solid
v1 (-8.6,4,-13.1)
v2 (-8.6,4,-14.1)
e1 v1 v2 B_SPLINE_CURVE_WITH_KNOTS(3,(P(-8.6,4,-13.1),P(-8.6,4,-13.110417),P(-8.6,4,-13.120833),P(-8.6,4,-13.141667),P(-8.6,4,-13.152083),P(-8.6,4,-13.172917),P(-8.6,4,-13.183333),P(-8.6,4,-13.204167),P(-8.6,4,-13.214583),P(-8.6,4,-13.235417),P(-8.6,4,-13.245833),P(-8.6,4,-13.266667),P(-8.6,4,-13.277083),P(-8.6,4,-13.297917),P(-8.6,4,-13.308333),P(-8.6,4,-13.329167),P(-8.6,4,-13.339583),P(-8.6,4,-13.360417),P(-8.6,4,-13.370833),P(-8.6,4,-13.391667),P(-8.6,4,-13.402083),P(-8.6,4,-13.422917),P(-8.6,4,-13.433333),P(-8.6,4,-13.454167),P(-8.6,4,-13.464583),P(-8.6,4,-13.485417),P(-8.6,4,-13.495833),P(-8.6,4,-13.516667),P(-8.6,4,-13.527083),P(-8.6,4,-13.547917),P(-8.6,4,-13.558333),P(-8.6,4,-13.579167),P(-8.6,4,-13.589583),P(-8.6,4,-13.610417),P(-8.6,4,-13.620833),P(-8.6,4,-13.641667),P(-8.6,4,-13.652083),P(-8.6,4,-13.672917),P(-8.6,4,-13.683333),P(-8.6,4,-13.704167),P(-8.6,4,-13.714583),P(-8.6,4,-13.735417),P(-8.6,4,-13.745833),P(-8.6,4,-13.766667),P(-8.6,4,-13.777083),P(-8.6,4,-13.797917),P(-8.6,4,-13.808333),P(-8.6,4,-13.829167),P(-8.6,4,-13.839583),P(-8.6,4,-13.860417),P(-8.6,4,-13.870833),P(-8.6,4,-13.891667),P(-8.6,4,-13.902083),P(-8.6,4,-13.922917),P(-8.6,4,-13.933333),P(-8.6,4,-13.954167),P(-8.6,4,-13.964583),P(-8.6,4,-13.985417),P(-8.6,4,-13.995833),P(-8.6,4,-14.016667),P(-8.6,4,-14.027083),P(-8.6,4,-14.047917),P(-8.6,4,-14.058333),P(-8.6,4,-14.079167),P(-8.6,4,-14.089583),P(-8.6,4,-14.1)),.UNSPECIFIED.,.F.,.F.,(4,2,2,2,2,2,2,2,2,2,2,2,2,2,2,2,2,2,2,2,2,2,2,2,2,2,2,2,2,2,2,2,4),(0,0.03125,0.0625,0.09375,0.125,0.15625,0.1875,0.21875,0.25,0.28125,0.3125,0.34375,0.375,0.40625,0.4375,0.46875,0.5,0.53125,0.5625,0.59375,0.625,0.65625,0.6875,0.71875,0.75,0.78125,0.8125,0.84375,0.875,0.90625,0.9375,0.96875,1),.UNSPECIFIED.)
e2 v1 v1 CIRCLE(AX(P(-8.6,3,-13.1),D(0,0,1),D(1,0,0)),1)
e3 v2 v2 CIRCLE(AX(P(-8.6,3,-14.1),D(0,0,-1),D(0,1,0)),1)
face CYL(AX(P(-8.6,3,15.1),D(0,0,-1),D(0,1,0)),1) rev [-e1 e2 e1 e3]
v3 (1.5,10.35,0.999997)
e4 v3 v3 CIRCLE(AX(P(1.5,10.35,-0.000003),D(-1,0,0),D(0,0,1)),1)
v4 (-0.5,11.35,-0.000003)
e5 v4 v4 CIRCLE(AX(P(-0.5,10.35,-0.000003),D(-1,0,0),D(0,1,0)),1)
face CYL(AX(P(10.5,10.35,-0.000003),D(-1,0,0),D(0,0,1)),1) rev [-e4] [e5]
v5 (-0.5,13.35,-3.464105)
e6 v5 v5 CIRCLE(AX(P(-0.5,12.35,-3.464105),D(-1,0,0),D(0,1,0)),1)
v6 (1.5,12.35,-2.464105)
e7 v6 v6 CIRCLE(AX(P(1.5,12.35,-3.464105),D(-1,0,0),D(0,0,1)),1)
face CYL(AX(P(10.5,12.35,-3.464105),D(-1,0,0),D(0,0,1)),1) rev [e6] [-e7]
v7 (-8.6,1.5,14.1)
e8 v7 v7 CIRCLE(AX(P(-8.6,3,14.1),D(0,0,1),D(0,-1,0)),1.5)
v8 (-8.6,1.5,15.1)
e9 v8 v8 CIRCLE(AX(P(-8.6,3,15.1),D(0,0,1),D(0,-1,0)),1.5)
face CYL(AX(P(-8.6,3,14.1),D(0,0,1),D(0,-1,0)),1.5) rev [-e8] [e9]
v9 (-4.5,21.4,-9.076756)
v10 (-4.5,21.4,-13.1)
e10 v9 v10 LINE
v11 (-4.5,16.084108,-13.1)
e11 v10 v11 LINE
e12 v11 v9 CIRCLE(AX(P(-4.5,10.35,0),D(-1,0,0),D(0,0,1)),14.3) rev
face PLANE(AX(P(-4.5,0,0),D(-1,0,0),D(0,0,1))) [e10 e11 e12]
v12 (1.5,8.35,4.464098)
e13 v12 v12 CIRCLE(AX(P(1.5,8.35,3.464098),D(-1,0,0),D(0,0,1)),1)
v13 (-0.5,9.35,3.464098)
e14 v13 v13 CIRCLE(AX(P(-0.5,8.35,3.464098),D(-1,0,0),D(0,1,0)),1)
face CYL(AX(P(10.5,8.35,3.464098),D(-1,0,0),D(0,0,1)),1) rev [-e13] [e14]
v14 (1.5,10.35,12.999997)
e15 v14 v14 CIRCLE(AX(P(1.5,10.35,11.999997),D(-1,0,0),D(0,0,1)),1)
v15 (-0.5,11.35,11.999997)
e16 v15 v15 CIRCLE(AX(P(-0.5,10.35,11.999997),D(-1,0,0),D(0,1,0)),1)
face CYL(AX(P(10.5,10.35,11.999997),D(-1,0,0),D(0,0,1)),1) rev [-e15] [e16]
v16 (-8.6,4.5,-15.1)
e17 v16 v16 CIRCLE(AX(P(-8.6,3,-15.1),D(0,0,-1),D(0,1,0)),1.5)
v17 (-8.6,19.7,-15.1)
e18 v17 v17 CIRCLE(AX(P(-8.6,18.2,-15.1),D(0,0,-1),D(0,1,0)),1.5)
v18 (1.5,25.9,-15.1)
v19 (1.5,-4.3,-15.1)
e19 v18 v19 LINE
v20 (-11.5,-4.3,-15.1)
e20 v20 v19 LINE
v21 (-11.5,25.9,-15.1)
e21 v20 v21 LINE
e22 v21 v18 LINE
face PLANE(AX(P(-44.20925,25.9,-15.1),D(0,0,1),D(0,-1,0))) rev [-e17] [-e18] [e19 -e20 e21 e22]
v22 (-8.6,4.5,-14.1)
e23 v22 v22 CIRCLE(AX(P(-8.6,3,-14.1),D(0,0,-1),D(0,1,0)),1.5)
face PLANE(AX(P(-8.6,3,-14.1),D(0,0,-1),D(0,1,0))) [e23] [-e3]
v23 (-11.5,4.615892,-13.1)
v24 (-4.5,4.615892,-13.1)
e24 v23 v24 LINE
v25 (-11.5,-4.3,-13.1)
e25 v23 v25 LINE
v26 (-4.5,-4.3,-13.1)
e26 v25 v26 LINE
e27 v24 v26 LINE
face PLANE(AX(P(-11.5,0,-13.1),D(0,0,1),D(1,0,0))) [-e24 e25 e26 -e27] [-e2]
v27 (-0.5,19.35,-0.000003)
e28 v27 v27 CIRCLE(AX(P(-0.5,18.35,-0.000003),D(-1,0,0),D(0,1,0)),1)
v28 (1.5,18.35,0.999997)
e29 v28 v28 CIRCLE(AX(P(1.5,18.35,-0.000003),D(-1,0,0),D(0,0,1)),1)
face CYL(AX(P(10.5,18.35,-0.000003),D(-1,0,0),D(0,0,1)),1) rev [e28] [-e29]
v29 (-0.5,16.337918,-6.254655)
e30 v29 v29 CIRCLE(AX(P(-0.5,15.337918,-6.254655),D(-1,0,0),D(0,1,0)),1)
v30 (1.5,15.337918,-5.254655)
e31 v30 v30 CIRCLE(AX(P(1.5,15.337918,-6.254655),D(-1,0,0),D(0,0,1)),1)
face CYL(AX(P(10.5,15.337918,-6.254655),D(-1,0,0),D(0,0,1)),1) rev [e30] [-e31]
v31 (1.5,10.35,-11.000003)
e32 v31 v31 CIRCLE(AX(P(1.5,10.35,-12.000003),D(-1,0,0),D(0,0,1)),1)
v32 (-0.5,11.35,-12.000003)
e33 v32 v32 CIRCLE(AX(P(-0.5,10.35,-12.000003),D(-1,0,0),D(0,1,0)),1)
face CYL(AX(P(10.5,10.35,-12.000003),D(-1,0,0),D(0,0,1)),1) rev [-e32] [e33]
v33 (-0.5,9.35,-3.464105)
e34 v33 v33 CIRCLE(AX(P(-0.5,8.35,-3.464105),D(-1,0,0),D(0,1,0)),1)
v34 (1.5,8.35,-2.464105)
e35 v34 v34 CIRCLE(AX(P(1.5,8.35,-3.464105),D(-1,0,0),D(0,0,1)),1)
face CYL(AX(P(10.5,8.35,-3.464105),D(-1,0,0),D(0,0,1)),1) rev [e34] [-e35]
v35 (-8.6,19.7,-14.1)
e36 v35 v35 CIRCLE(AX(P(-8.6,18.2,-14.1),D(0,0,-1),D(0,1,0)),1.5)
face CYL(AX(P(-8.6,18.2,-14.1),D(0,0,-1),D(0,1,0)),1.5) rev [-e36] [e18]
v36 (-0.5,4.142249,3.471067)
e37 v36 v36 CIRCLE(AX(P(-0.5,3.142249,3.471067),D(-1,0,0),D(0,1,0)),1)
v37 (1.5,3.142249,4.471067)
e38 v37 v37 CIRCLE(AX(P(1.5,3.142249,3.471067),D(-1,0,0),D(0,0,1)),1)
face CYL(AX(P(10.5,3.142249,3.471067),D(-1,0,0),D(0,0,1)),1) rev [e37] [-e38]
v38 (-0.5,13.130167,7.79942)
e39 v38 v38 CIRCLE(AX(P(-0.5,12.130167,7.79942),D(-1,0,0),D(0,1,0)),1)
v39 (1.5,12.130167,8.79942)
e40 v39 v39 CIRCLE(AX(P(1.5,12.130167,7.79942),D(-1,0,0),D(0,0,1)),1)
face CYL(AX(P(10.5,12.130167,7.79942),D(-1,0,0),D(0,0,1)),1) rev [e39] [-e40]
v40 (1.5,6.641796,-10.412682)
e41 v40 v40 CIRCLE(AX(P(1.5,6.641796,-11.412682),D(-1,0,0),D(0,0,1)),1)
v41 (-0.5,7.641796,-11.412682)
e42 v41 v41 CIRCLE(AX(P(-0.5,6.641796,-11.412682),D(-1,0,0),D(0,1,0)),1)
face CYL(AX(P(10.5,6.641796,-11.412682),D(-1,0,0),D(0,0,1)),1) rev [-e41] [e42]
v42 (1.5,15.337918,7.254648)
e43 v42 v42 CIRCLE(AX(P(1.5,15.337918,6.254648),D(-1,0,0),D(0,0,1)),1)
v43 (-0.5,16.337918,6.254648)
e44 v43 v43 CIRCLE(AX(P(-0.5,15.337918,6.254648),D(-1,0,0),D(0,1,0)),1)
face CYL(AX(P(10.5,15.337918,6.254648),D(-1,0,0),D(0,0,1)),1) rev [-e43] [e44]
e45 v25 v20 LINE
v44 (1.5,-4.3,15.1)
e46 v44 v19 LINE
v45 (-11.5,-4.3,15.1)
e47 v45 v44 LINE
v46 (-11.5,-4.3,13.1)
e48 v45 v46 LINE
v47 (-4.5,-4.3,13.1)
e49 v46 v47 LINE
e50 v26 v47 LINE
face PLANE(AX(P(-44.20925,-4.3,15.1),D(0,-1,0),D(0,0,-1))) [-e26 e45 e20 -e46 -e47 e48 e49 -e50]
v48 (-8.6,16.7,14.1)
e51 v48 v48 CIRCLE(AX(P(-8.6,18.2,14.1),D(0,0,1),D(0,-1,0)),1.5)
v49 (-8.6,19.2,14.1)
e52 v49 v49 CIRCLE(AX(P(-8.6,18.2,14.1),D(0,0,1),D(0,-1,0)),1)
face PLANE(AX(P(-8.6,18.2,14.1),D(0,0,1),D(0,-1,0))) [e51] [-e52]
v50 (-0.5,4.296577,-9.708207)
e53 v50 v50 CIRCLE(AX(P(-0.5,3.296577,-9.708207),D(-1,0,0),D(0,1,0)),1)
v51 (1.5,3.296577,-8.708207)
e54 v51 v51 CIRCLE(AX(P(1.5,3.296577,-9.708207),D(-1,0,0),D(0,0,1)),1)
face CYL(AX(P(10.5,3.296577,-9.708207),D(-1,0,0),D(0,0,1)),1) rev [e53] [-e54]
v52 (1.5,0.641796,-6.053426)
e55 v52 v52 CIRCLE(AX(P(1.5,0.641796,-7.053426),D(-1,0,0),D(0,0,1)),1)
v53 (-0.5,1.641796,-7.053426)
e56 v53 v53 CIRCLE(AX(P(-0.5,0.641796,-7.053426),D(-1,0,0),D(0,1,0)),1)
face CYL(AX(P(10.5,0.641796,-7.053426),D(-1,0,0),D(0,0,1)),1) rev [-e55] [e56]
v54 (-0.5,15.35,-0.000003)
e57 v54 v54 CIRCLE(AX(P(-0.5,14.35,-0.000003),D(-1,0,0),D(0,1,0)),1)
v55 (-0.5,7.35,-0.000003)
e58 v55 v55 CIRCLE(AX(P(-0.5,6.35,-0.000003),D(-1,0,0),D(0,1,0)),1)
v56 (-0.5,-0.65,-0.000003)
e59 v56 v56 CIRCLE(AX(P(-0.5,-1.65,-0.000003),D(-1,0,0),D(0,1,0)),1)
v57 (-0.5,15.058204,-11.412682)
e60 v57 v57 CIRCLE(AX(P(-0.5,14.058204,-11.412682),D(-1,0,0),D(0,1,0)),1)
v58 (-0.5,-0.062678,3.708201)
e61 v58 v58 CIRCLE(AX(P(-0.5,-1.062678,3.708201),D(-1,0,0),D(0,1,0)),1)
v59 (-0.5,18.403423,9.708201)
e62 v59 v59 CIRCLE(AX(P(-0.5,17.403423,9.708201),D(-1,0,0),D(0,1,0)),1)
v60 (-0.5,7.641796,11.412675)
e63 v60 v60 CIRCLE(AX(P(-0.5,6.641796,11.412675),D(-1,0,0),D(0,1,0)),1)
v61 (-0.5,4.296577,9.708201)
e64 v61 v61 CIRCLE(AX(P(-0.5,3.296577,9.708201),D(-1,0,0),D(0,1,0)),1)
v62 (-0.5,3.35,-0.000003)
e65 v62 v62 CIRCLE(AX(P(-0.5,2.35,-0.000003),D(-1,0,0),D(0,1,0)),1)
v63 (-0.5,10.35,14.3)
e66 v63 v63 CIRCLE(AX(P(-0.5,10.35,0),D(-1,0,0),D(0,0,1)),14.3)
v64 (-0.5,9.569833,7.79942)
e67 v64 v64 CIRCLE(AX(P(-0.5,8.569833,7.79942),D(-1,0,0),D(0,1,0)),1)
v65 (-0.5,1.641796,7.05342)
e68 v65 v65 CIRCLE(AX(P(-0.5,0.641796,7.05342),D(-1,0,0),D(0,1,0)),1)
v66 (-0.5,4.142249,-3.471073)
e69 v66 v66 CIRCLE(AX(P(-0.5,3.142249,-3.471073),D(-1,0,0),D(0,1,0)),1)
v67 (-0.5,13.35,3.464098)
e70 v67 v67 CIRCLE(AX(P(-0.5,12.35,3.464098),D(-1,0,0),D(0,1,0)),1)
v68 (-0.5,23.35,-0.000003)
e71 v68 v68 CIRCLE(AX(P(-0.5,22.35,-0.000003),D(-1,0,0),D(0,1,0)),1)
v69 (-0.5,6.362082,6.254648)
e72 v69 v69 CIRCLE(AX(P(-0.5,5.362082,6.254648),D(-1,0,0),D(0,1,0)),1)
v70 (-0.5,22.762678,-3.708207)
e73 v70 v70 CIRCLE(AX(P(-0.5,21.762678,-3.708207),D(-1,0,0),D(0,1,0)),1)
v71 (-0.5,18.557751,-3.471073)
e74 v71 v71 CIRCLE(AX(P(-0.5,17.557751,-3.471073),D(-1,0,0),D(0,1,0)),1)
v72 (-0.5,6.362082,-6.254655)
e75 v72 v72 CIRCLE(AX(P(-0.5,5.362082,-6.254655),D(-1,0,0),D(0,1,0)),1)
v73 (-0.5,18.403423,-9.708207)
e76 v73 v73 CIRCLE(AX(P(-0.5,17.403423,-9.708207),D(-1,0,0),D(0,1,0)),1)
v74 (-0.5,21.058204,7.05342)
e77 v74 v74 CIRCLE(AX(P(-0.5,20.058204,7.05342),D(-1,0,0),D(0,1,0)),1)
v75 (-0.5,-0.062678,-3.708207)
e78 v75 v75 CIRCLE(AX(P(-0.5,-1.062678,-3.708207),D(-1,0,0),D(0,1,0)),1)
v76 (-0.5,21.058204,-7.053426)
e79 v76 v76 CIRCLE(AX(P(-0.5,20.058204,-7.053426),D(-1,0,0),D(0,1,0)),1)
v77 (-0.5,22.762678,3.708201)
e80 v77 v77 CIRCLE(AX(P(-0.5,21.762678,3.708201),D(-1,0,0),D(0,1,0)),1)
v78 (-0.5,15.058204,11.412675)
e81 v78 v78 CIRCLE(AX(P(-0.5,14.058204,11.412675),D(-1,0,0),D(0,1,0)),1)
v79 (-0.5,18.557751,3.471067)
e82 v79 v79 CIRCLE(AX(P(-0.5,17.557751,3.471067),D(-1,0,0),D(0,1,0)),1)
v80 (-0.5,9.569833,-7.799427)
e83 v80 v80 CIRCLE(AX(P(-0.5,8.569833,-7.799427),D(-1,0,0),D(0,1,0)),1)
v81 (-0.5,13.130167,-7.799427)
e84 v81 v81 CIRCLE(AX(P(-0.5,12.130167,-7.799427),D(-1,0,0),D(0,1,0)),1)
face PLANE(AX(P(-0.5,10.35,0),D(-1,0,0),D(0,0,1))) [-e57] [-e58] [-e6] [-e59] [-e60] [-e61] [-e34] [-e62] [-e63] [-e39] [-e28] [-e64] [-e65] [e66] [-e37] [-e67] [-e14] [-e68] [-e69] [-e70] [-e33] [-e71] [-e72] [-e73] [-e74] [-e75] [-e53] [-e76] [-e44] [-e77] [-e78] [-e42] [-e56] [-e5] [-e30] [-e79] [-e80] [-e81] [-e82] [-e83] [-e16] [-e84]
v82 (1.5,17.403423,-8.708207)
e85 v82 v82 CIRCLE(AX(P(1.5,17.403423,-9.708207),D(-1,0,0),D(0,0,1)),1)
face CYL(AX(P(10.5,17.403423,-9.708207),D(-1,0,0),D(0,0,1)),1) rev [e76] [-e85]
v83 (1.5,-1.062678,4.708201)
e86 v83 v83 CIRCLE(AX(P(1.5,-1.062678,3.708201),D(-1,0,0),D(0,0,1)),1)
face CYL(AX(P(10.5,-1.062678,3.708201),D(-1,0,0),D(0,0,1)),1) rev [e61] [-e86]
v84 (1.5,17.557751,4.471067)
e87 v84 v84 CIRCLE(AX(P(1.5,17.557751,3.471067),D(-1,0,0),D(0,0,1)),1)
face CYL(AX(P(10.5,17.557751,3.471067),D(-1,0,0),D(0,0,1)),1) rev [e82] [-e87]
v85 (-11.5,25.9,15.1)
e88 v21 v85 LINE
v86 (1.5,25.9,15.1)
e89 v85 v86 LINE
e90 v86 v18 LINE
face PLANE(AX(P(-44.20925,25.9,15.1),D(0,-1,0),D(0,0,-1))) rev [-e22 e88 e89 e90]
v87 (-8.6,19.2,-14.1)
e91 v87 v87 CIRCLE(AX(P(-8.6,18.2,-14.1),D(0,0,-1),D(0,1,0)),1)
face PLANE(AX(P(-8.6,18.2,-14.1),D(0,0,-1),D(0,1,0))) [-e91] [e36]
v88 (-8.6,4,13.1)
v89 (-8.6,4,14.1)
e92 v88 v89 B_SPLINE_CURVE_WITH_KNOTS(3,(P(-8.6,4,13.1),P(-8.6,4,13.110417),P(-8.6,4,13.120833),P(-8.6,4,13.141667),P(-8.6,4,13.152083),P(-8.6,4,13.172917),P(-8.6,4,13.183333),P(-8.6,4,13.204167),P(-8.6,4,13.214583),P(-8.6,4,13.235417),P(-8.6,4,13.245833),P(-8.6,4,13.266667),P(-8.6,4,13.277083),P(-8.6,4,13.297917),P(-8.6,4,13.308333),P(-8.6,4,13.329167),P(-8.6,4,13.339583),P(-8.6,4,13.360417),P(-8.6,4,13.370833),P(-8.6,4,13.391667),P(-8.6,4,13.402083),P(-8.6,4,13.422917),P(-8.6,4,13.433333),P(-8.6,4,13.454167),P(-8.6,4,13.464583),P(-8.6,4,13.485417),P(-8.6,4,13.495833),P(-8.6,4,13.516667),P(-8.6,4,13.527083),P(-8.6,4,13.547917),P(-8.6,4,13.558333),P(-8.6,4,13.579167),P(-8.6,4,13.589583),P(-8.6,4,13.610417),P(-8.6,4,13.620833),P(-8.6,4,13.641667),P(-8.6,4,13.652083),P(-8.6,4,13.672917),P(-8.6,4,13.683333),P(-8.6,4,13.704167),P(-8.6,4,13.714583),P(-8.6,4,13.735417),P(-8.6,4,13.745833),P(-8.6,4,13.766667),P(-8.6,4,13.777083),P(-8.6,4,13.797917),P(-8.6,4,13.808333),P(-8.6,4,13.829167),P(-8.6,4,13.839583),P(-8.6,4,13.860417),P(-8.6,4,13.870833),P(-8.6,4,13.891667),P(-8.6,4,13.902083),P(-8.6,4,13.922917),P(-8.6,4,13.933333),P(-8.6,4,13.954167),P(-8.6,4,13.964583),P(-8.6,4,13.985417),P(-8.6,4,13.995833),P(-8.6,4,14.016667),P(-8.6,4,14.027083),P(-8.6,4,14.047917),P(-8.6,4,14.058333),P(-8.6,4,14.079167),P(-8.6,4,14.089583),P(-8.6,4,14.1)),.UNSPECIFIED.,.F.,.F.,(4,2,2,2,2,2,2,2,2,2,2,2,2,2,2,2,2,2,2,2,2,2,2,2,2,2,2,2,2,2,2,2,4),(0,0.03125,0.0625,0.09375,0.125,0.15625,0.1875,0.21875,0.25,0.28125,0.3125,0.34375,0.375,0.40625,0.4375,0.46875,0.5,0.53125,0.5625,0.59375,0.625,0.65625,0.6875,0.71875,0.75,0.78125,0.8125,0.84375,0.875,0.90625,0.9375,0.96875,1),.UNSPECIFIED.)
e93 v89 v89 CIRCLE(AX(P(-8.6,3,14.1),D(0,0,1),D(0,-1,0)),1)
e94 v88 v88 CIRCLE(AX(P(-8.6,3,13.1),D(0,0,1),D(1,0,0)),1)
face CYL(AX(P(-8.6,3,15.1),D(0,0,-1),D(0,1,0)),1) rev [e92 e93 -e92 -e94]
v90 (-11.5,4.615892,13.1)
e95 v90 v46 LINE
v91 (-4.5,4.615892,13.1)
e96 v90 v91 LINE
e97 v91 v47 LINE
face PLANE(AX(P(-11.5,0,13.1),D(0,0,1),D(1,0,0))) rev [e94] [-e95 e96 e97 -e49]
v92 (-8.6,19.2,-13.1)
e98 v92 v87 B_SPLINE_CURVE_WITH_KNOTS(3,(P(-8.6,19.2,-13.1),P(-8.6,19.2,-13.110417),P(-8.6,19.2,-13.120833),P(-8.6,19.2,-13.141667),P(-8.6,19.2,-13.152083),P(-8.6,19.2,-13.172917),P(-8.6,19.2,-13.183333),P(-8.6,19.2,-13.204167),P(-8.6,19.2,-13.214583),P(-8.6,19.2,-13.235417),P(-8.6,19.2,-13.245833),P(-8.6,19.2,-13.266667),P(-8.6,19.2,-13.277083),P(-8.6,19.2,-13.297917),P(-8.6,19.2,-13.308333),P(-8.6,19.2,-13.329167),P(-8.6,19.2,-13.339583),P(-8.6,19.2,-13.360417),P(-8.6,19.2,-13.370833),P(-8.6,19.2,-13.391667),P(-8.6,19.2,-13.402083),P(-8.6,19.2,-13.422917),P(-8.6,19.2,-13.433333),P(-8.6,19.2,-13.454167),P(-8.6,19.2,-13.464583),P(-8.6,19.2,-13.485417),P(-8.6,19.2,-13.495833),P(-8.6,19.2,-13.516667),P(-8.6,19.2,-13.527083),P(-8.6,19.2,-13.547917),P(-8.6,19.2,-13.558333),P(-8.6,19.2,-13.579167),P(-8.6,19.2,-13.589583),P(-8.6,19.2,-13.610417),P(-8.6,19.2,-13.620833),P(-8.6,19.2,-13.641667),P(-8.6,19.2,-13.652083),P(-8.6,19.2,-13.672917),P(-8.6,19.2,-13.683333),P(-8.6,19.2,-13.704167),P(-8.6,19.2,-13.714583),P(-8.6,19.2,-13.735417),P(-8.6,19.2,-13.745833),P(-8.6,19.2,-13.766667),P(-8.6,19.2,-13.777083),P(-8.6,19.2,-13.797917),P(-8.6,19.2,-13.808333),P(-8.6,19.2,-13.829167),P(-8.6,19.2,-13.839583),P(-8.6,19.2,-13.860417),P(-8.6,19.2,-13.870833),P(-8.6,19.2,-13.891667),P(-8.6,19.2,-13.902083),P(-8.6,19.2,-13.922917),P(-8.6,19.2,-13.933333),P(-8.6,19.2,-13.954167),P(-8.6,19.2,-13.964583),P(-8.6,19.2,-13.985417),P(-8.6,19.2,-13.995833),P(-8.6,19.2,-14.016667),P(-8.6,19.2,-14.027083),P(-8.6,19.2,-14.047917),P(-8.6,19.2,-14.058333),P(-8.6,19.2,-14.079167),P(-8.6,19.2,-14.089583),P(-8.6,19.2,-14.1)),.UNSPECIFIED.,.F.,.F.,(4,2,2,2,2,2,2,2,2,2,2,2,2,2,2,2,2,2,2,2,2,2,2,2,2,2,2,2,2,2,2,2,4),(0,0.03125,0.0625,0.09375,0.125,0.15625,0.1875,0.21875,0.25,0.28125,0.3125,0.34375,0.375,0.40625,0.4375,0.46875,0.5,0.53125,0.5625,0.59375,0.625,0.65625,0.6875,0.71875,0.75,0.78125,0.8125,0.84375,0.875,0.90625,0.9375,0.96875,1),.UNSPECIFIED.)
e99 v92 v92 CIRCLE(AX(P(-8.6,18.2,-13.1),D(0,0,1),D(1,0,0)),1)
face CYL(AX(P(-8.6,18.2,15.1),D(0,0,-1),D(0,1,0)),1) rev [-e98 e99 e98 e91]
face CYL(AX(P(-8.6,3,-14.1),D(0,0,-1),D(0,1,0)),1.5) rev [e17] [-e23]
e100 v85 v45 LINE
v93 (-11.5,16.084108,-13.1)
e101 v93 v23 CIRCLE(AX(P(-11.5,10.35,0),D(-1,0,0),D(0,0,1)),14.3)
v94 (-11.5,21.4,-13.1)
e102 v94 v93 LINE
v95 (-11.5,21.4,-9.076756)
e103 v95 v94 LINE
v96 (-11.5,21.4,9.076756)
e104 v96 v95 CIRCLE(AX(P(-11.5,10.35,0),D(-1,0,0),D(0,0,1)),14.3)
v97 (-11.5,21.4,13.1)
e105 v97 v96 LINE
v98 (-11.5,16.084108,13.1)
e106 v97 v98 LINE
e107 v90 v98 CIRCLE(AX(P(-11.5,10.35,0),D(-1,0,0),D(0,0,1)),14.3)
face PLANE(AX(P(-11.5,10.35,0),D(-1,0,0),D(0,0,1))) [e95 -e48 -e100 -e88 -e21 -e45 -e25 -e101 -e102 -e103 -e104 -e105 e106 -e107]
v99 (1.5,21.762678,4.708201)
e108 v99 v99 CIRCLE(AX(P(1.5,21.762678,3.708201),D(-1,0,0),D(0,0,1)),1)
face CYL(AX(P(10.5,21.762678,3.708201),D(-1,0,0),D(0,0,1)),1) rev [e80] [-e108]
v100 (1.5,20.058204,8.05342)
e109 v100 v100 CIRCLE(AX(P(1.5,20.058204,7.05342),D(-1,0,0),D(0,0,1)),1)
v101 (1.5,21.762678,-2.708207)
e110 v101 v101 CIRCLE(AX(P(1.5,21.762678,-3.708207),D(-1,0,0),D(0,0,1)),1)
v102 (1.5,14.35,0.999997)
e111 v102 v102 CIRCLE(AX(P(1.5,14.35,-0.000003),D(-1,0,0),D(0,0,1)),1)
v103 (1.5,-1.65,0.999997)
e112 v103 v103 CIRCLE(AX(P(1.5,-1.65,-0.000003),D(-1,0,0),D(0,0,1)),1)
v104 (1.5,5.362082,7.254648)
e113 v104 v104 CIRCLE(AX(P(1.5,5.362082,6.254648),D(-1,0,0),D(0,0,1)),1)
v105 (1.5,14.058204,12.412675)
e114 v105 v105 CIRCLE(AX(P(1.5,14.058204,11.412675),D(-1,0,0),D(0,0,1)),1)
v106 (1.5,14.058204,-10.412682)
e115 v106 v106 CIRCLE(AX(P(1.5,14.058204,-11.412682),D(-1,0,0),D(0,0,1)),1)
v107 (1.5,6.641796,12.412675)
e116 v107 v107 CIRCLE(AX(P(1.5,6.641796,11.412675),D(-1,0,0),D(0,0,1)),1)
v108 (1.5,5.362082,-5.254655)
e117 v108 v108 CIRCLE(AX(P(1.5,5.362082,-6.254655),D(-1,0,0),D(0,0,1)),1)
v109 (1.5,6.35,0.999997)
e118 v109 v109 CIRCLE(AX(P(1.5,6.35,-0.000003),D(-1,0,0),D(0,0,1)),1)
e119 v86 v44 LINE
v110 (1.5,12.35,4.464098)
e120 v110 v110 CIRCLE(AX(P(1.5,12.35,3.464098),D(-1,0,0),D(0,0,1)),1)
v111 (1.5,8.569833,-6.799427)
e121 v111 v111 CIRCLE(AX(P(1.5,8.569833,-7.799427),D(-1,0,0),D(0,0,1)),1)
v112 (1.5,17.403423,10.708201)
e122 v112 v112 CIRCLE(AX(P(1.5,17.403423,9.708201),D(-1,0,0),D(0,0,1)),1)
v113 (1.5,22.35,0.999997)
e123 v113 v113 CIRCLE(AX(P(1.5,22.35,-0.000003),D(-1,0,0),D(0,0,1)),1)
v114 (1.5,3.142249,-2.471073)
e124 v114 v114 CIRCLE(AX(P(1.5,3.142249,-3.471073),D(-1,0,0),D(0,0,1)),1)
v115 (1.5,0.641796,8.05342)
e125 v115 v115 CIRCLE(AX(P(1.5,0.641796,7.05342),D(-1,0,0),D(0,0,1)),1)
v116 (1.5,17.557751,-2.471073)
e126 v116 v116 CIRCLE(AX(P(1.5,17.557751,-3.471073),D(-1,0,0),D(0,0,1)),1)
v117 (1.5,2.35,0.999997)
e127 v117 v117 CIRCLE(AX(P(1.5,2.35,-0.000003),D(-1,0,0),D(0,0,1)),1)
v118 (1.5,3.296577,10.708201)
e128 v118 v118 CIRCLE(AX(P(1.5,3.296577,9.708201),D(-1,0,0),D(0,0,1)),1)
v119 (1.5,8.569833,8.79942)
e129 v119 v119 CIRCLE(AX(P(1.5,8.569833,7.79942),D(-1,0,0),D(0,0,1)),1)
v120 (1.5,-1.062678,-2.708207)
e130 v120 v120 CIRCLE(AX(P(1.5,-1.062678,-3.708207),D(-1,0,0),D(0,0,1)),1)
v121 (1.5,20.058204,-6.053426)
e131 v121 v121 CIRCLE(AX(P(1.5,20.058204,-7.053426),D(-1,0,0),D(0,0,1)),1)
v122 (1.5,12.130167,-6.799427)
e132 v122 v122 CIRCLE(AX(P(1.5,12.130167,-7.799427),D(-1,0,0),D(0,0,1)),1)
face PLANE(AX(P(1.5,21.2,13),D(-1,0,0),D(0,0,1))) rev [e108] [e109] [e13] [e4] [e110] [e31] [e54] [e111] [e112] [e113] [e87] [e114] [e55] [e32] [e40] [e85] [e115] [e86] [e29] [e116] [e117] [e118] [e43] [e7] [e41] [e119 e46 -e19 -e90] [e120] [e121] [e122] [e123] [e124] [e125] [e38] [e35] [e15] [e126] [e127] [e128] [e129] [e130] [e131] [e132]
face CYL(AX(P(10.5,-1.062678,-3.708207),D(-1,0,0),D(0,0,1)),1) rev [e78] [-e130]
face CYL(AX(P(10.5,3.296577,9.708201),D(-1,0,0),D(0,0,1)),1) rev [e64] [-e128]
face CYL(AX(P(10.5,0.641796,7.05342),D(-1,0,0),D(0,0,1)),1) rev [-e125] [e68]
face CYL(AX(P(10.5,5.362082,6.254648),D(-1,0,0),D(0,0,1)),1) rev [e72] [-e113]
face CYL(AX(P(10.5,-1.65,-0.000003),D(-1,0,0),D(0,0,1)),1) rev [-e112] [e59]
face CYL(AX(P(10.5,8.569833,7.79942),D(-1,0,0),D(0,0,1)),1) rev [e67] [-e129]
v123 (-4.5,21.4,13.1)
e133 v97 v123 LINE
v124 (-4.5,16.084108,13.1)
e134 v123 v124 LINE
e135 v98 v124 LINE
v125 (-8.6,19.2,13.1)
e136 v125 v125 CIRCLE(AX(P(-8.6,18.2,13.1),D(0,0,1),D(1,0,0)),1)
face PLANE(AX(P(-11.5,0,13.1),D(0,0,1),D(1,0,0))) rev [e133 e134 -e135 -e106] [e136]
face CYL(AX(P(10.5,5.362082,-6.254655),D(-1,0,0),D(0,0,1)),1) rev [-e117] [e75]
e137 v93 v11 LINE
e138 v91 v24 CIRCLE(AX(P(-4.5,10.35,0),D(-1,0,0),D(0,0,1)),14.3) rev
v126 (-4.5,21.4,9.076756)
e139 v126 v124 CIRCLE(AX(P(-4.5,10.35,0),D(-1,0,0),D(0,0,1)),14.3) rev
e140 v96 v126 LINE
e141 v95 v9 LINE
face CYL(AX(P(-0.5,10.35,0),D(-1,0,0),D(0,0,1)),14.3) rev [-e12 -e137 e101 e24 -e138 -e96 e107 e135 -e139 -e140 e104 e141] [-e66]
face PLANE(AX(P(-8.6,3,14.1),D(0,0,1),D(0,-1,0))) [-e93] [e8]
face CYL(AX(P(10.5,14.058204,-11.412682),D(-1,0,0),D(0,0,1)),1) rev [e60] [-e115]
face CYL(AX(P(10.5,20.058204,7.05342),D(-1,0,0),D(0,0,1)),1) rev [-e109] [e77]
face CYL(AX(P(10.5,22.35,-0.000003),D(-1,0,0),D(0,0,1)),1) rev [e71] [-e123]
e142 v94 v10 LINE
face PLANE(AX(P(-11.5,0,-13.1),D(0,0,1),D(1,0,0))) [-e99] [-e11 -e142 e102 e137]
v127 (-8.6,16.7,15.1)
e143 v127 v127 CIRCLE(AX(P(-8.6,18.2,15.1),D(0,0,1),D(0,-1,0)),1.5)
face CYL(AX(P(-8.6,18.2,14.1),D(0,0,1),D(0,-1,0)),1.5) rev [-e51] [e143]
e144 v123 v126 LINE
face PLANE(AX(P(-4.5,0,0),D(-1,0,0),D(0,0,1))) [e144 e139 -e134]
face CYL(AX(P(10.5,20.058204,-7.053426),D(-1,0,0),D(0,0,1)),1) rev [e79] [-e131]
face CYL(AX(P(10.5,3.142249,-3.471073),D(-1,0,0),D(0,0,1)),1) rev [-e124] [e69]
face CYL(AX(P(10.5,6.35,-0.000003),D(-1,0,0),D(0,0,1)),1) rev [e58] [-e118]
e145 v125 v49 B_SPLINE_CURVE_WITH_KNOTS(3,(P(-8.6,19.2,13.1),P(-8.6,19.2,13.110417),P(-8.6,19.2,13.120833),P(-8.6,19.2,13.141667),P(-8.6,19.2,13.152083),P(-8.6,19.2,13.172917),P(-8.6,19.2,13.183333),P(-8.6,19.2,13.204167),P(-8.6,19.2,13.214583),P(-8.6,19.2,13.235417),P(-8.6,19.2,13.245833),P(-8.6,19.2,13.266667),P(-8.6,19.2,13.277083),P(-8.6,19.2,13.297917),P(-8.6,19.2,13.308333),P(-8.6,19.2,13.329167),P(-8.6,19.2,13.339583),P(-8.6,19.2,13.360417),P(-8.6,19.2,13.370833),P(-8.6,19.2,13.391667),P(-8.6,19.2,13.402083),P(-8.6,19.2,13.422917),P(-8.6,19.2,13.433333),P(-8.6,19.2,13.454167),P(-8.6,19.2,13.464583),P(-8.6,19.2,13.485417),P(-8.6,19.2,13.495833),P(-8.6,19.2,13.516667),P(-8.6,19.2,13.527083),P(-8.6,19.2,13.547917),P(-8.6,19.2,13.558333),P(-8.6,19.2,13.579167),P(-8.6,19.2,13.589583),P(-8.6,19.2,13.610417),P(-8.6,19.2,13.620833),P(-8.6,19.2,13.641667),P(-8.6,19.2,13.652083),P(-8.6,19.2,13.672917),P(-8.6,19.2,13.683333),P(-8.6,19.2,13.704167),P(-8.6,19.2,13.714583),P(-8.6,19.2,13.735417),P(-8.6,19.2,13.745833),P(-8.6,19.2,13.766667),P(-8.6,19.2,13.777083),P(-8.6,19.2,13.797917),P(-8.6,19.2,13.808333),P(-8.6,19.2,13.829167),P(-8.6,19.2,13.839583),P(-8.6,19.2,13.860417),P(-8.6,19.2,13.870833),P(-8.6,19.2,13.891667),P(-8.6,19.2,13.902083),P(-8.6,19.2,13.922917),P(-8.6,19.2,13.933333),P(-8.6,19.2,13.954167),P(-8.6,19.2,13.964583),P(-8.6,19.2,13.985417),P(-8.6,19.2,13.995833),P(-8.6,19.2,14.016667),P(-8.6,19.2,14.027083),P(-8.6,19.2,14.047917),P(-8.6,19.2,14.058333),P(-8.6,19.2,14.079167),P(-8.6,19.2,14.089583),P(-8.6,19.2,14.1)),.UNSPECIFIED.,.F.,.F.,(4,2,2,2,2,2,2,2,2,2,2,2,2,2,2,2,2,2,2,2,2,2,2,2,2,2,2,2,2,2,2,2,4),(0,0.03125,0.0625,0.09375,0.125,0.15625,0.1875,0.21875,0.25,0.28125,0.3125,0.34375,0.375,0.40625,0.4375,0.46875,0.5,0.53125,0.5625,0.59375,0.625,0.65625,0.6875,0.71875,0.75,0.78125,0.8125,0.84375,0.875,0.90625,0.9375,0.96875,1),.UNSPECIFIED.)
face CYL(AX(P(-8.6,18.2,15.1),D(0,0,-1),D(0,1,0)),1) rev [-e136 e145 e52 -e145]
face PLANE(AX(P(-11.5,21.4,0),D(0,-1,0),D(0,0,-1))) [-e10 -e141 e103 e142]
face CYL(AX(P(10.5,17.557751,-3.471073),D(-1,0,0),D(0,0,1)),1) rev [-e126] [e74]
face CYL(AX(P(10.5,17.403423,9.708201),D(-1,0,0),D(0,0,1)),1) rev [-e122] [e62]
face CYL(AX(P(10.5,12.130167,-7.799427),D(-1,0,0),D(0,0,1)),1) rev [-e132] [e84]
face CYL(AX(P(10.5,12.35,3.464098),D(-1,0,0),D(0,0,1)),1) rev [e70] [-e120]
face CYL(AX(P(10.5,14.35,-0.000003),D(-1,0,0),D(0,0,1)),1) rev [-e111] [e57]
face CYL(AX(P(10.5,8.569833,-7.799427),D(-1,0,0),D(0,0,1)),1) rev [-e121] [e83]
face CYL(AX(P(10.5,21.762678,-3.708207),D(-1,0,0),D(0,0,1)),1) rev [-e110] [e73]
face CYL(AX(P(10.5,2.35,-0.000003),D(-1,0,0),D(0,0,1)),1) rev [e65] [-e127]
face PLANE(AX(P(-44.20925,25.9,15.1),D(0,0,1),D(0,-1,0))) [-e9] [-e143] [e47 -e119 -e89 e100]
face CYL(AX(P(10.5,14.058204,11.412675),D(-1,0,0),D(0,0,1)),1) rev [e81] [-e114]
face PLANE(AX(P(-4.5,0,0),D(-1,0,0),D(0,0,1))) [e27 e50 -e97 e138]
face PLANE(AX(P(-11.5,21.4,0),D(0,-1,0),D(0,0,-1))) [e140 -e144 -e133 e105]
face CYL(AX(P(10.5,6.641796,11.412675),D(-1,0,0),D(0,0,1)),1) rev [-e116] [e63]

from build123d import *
from build123d.topology import SkipClean

# Parameters (mm, degrees)
SKETCH_1_W          = 3.0000000000000027
SKETCH_1_H          = 26
EXTRUDE_1_DEPTH     = 21.2
EXTRUDE_2_DEPTH     = 3
SKETCH_2_R          = 14.3
CUT_EXTRUDE_1_DEPTH = 1
EXTRUDE_START       = 3
EXTRUDE_3_DEPTH     = 3
EXTRUDE_START_2     = 10
EXTRUDE_4_DEPTH     = 7
SKETCH_7_R          = 1.0000000000000018
SKETCH_7_R_2        = 1.0000000000000016
CUT_EXTRUDE_2_DEPTH = 42.41376582731883
SKETCH_7_3_R        = 1.5000000000000009
SKETCH_7_3_R_2      = 1.0000000000000018
SKETCH_7_3_R_3      = 1.5000000000000004
SKETCH_7_3_R_4      = 1.0000000000000016
CUT_EXTRUDE_3_DEPTH = 1
CUT_EXTRUDE_START   = -29.2
SKETCH_7_4_R        = 1.5000000000000009
SKETCH_7_4_R_2      = 1.0000000000000018
SKETCH_7_4_R_3      = 1.5000000000000004
SKETCH_7_4_R_4      = 1.0000000000000016
CUT_EXTRUDE_4_DEPTH = 1
OTHER_START         = -0.5
OTHER_1_OUTLINE_R   = 1
OTHER_1_DEPTH       = 2


# Read off the part's stored shape, not the designer's step: 填充阵列1
with BuildPart() as part:
    # 草图1 → 凸台-拉伸1 (new body)
    with BuildSketch(Plane(origin=(0, 0, 0), x_dir=(1, 0, 0), z_dir=(0, 1, 0))):
        Rectangle(SKETCH_1_W, SKETCH_1_H)
    extrude(amount=EXTRUDE_1_DEPTH)

    # 草图5 → 凸台-拉伸2 (add)
    with BuildSketch(Plane(origin=(1.5000000000000013, 0, 0), x_dir=(0, 0, -1), z_dir=(1, 0, 0))):
        Polygon((-15.100000000000001, 25.9), (15.099999999999998, 25.900000000000002), (15.100000000000001, -4.299999999999996), (-15.099999999999998, -4.3), align=None)
    extrude(amount=-EXTRUDE_2_DEPTH)

    # 草图2 → 切除-拉伸1 (cut)
    with BuildSketch(Plane.ZY.offset(1.5000000000000013)):
        with Locations((1.8546e-13, 10.35000000000003)):
            Circle(SKETCH_2_R)
    extrude(amount=-CUT_EXTRUDE_1_DEPTH, mode=Mode.SUBTRACT)

    # 草图6 → 凸台-拉伸3 (add)
    with SkipClean():  # the faces are left unmerged after this step: merging them gives an invalid solid
        with BuildSketch(Plane.ZY.offset(1.5000000000000013).offset(EXTRUDE_START)):
            with BuildLine():
                Line((15.100000000000001, 25.9), (-15.099999999999998, 25.9))
                Line((-15.099999999999998, 25.9), (-15.099999999999994, 21.4))
                Line((-15.099999999999994, 21.4), (-13.099999999999994, 21.4))
                Line((-13.099999999999994, 21.4), (-9.076756028450045, 21.4))
                ThreePointArc((-9.07675602844997, 21.39999999999975), (-2.1374e-13, 24.65000000000003), (9.076756028449726, 21.400000000000254))
                Line((9.076756028449651, 21.4), (13.100000000000001, 21.4))
                Line((13.100000000000001, 21.4), (15.100000000000001, 21.4))
                Line((15.100000000000001, 21.4), (15.100000000000001, 25.9))
            make_face()
            with BuildLine():
                Line((-13.099999999999994, 21.4), (-15.099999999999994, 21.4))
                Line((-15.099999999999994, 21.4), (-15.099999999999994, -4.3))
                Line((-15.099999999999994, -4.3), (-13.099999999999994, -4.3))
                Line((-13.099999999999994, -4.3), (-13.099999999999994, 4.615891525267789))
                ThreePointArc((-13.099999999999968, 4.615891525267795), (-14.299999999999816, 10.350000000000032), (-13.099999999999962, 16.084108474732275))
                Line((-13.099999999999994, 16.084108474732275), (-13.099999999999994, 21.4))
            make_face()
            with BuildLine():
                Line((-9.076756028450045, 21.4), (-13.099999999999994, 21.4))
                Line((-13.099999999999994, 21.4), (-13.099999999999994, 16.084108474732275))
                ThreePointArc((-13.099999999999962, 16.084108474732275), (-11.4024910727196, 18.979785474537948), (-9.07675602844997, 21.39999999999975))
            make_face()
            with BuildLine():
                Line((13.100000000000001, 16.084108474732616), (13.100000000000001, 21.4))
                Line((13.100000000000001, 21.4), (9.076756028449651, 21.4))
                ThreePointArc((9.076756028449726, 21.400000000000254), (11.402491072719606, 18.97978547453843), (13.100000000000168, 16.084108474732652))
            make_face()
            with BuildLine():
                Line((15.100000000000001, -4.3), (15.100000000000001, 21.4))
                Line((15.100000000000001, 21.4), (13.100000000000001, 21.4))
                Line((13.100000000000001, 21.4), (13.100000000000001, 16.084108474732616))
                ThreePointArc((13.100000000000168, 16.084108474732652), (13.996785345214274, 13.279163703175414), (14.300000000000185, 10.35000000000003))
                ThreePointArc((14.300000000000185, 10.350000000000026), (13.996785345214237, 7.420836296824469), (13.100000000000025, 4.615891525267081))
                Line((13.100000000000001, 4.6158915252670925), (13.100000000000001, -4.3))
                Line((13.100000000000001, -4.3), (15.100000000000001, -4.3))
            make_face()
            with BuildLine():
                Line((-13.099999999999994, 4.615891525267789), (-13.099999999999994, -4.3))
                Line((-13.099999999999994, -4.299999999999996), (13.100000000000001, -4.3))
                Line((13.100000000000001, -4.3), (13.100000000000001, 4.6158915252670925))
                ThreePointArc((13.100000000000025, 4.615891525267081), (-1.982e-13, -3.949999999999971), (-13.099999999999968, 4.615891525267795))
            make_face()
        extrude(amount=-EXTRUDE_3_DEPTH)

    # 草图6<3> → 凸台-拉伸4 (add)
    with BuildSketch(Plane.ZY.offset(1.5000000000000013).offset(EXTRUDE_START_2)):
        with BuildLine():
            Line((15.100000000000001, 25.9), (-15.099999999999998, 25.9))
            Line((-15.099999999999998, 25.9), (-15.099999999999994, 21.4))
            Line((-15.099999999999994, 21.4), (-13.099999999999994, 21.4))
            Line((-13.099999999999994, 21.4), (-9.076756028450045, 21.4))
            ThreePointArc((-9.07675602844997, 21.39999999999975), (-2.1374e-13, 24.65000000000003), (9.076756028449726, 21.400000000000254))
            Line((9.076756028449651, 21.4), (13.100000000000001, 21.4))
            Line((13.100000000000001, 21.4), (15.100000000000001, 21.4))
            Line((15.100000000000001, 21.4), (15.100000000000001, 25.9))
        make_face()
        with BuildLine():
            Line((-13.099999999999994, 21.4), (-15.099999999999994, 21.4))
            Line((-15.099999999999994, 21.4), (-15.099999999999994, -4.3))
            Line((-15.099999999999994, -4.3), (-13.099999999999994, -4.3))
            Line((-13.099999999999994, -4.3), (-13.099999999999994, 4.615891525267789))
            ThreePointArc((-13.099999999999968, 4.615891525267795), (-14.299999999999816, 10.350000000000032), (-13.099999999999962, 16.084108474732275))
            Line((-13.099999999999994, 16.084108474732275), (-13.099999999999994, 21.4))
        make_face()
        with BuildLine():
            Line((15.100000000000001, -4.3), (15.100000000000001, 21.4))
            Line((15.100000000000001, 21.4), (13.100000000000001, 21.4))
            Line((13.100000000000001, 21.4), (13.100000000000001, 16.084108474732616))
            ThreePointArc((13.100000000000168, 16.084108474732652), (13.996785345214274, 13.279163703175414), (14.300000000000185, 10.35000000000003))
            ThreePointArc((14.300000000000185, 10.350000000000026), (13.996785345214237, 7.420836296824469), (13.100000000000025, 4.615891525267081))
            Line((13.100000000000001, 4.6158915252670925), (13.100000000000001, -4.3))
            Line((13.100000000000001, -4.3), (15.100000000000001, -4.3))
        make_face()
    extrude(amount=-EXTRUDE_4_DEPTH)

    # 草图7 → 切除-拉伸2 (cut, through all)
    with BuildSketch(Plane(origin=(0, 1.73e-15, -15.100000000000001), x_dir=(-1, 0, 0), z_dir=(0, 1.1e-16, -1))):
        with Locations(Location((8.599999999999989, 18.2, 0), (0, 0, 90))):
            Circle(SKETCH_7_R)
        with Locations(Location((8.599999999999989, 3, 0), (0, 0, 90))):
            Circle(SKETCH_7_R_2)
    extrude(amount=-CUT_EXTRUDE_2_DEPTH, mode=Mode.SUBTRACT)

    # 草图7<3> → 切除-拉伸3 (cut)
    # profile 1 of 2: a face of its own
    with BuildSketch(Plane(origin=(0, 1.73e-15, -15.100000000000001), x_dir=(-1, 0, 0), z_dir=(0, 1.1e-16, -1))):
        with Locations(Location((8.599999999999989, 18.2, 0), (0, 0, 90))):
            Circle(SKETCH_7_3_R)
        with Locations(Location((8.599999999999989, 18.2, 0), (0, 0, 90))):
            Circle(SKETCH_7_3_R_2, mode=Mode.SUBTRACT)
    # profile 2 of 2: a face of its own
    with BuildSketch(Plane(origin=(0, 1.73e-15, -15.100000000000001), x_dir=(-1, 0, 0), z_dir=(0, 1.1e-16, -1))):
        with Locations(Location((8.599999999999989, 3, 0), (0, 0, 90))):
            Circle(SKETCH_7_3_R_3)
        with Locations(Location((8.599999999999989, 3, 0), (0, 0, 90))):
            Circle(SKETCH_7_3_R_4, mode=Mode.SUBTRACT)
    extrude(amount=-CUT_EXTRUDE_3_DEPTH, mode=Mode.SUBTRACT)

    # 草图7<4> → 切除-拉伸4 (cut)
    # profile 1 of 2: a face of its own
    with BuildSketch(Plane(origin=(0, 1.73e-15, -15.100000000000001), x_dir=(-1, 0, 0), z_dir=(0, 1.1e-16, -1)).offset(CUT_EXTRUDE_START)):
        with Locations(Location((8.599999999999989, 18.2, 0), (0, 0, 90))):
            Circle(SKETCH_7_4_R)
        with Locations(Location((8.599999999999989, 18.2, 0), (0, 0, 90))):
            Circle(SKETCH_7_4_R_2, mode=Mode.SUBTRACT)
    # profile 2 of 2: a face of its own
    with BuildSketch(Plane(origin=(0, 1.73e-15, -15.100000000000001), x_dir=(-1, 0, 0), z_dir=(0, 1.1e-16, -1)).offset(CUT_EXTRUDE_START)):
        with Locations(Location((8.599999999999989, 3, 0), (0, 0, 90))):
            Circle(SKETCH_7_4_R_3)
        with Locations(Location((8.599999999999989, 3, 0), (0, 0, 90))):
            Circle(SKETCH_7_4_R_4, mode=Mode.SUBTRACT)
    extrude(amount=-CUT_EXTRUDE_4_DEPTH, mode=Mode.SUBTRACT)

    # 填充阵列1 outline → 填充阵列1 (cut)
    with BuildSketch(Plane.YZ.offset(OTHER_START)):
        with Locations((10.35, -3.37e-06)):
            Circle(OTHER_1_OUTLINE_R)
        with Locations((10.35, -12.00000337)):
            Circle(OTHER_1_OUTLINE_R)
        with Locations((6.641796068, -11.412681566)):
            Circle(OTHER_1_OUTLINE_R)
        with Locations((3.296576972, -9.708207303)):
            Circle(OTHER_1_OUTLINE_R)
        with Locations((17.557750943, -3.471073283)):
            Circle(OTHER_1_OUTLINE_R)
        with Locations((14.058203932, -11.412681566)):
            Circle(OTHER_1_OUTLINE_R)
        with Locations((17.403423028, -9.708207303)):
            Circle(OTHER_1_OUTLINE_R)
        with Locations((20.058203932, -7.053426398)):
            Circle(OTHER_1_OUTLINE_R)
        with Locations((21.762678196, -3.708207303)):
            Circle(OTHER_1_OUTLINE_R)
        with Locations((17.403423028, 9.708200562)):
            Circle(OTHER_1_OUTLINE_R)
        with Locations((12.130167472, 7.799419927)):
            Circle(OTHER_1_OUTLINE_R)
        with Locations((6.35, -3.37e-06)):
            Circle(OTHER_1_OUTLINE_R)
        with Locations((20.058203932, 7.053419657)):
            Circle(OTHER_1_OUTLINE_R)
        with Locations((8.35, -3.464104985)):
            Circle(OTHER_1_OUTLINE_R)
        with Locations((8.569832528, 7.799419927)):
            Circle(OTHER_1_OUTLINE_R)
        with Locations((14.058203932, 11.412674825)):
            Circle(OTHER_1_OUTLINE_R)
        with Locations((12.35, -3.464104985)):
            Circle(OTHER_1_OUTLINE_R)
        with Locations((12.35, 3.464098245)):
            Circle(OTHER_1_OUTLINE_R)
        with Locations((22.35, -3.37e-06)):
            Circle(OTHER_1_OUTLINE_R)
        with Locations((18.35, -3.37e-06)):
            Circle(OTHER_1_OUTLINE_R)
        with Locations((14.35, -3.37e-06)):
            Circle(OTHER_1_OUTLINE_R)
        with Locations((17.557750943, 3.471066543)):
            Circle(OTHER_1_OUTLINE_R)
        with Locations((21.762678196, 3.708200562)):
            Circle(OTHER_1_OUTLINE_R)
        with Locations((8.35, 3.464098245)):
            Circle(OTHER_1_OUTLINE_R)
        with Locations((15.337918415, 6.25464849)):
            Circle(OTHER_1_OUTLINE_R)
        with Locations((-1.65, -3.37e-06)):
            Circle(OTHER_1_OUTLINE_R)
        with Locations((8.569832528, -7.799426668)):
            Circle(OTHER_1_OUTLINE_R)
        with Locations((-1.062678196, 3.708200562)):
            Circle(OTHER_1_OUTLINE_R)
        with Locations((5.362081585, -6.25465523)):
            Circle(OTHER_1_OUTLINE_R)
        with Locations((0.641796068, -7.053426398)):
            Circle(OTHER_1_OUTLINE_R)
        with Locations((15.337918415, -6.25465523)):
            Circle(OTHER_1_OUTLINE_R)
        with Locations((-1.062678196, -3.708207303)):
            Circle(OTHER_1_OUTLINE_R)
        with Locations((12.130167472, -7.799426668)):
            Circle(OTHER_1_OUTLINE_R)
        with Locations((6.641796068, 11.412674825)):
            Circle(OTHER_1_OUTLINE_R)
        with Locations((3.142249057, 3.471066543)):
            Circle(OTHER_1_OUTLINE_R)
        with Locations((10.35, 11.99999663)):
            Circle(OTHER_1_OUTLINE_R)
        with Locations((5.362081585, 6.25464849)):
            Circle(OTHER_1_OUTLINE_R)
        with Locations((0.641796068, 7.053419657)):
            Circle(OTHER_1_OUTLINE_R)
        with Locations((3.142249057, -3.471073283)):
            Circle(OTHER_1_OUTLINE_R)
        with Locations((3.296576972, 9.708200562)):
            Circle(OTHER_1_OUTLINE_R)
        with Locations((2.35, -3.37e-06)):
            Circle(OTHER_1_OUTLINE_R)
    extrude(amount=OTHER_1_DEPTH, mode=Mode.SUBTRACT)


solid = part.part
